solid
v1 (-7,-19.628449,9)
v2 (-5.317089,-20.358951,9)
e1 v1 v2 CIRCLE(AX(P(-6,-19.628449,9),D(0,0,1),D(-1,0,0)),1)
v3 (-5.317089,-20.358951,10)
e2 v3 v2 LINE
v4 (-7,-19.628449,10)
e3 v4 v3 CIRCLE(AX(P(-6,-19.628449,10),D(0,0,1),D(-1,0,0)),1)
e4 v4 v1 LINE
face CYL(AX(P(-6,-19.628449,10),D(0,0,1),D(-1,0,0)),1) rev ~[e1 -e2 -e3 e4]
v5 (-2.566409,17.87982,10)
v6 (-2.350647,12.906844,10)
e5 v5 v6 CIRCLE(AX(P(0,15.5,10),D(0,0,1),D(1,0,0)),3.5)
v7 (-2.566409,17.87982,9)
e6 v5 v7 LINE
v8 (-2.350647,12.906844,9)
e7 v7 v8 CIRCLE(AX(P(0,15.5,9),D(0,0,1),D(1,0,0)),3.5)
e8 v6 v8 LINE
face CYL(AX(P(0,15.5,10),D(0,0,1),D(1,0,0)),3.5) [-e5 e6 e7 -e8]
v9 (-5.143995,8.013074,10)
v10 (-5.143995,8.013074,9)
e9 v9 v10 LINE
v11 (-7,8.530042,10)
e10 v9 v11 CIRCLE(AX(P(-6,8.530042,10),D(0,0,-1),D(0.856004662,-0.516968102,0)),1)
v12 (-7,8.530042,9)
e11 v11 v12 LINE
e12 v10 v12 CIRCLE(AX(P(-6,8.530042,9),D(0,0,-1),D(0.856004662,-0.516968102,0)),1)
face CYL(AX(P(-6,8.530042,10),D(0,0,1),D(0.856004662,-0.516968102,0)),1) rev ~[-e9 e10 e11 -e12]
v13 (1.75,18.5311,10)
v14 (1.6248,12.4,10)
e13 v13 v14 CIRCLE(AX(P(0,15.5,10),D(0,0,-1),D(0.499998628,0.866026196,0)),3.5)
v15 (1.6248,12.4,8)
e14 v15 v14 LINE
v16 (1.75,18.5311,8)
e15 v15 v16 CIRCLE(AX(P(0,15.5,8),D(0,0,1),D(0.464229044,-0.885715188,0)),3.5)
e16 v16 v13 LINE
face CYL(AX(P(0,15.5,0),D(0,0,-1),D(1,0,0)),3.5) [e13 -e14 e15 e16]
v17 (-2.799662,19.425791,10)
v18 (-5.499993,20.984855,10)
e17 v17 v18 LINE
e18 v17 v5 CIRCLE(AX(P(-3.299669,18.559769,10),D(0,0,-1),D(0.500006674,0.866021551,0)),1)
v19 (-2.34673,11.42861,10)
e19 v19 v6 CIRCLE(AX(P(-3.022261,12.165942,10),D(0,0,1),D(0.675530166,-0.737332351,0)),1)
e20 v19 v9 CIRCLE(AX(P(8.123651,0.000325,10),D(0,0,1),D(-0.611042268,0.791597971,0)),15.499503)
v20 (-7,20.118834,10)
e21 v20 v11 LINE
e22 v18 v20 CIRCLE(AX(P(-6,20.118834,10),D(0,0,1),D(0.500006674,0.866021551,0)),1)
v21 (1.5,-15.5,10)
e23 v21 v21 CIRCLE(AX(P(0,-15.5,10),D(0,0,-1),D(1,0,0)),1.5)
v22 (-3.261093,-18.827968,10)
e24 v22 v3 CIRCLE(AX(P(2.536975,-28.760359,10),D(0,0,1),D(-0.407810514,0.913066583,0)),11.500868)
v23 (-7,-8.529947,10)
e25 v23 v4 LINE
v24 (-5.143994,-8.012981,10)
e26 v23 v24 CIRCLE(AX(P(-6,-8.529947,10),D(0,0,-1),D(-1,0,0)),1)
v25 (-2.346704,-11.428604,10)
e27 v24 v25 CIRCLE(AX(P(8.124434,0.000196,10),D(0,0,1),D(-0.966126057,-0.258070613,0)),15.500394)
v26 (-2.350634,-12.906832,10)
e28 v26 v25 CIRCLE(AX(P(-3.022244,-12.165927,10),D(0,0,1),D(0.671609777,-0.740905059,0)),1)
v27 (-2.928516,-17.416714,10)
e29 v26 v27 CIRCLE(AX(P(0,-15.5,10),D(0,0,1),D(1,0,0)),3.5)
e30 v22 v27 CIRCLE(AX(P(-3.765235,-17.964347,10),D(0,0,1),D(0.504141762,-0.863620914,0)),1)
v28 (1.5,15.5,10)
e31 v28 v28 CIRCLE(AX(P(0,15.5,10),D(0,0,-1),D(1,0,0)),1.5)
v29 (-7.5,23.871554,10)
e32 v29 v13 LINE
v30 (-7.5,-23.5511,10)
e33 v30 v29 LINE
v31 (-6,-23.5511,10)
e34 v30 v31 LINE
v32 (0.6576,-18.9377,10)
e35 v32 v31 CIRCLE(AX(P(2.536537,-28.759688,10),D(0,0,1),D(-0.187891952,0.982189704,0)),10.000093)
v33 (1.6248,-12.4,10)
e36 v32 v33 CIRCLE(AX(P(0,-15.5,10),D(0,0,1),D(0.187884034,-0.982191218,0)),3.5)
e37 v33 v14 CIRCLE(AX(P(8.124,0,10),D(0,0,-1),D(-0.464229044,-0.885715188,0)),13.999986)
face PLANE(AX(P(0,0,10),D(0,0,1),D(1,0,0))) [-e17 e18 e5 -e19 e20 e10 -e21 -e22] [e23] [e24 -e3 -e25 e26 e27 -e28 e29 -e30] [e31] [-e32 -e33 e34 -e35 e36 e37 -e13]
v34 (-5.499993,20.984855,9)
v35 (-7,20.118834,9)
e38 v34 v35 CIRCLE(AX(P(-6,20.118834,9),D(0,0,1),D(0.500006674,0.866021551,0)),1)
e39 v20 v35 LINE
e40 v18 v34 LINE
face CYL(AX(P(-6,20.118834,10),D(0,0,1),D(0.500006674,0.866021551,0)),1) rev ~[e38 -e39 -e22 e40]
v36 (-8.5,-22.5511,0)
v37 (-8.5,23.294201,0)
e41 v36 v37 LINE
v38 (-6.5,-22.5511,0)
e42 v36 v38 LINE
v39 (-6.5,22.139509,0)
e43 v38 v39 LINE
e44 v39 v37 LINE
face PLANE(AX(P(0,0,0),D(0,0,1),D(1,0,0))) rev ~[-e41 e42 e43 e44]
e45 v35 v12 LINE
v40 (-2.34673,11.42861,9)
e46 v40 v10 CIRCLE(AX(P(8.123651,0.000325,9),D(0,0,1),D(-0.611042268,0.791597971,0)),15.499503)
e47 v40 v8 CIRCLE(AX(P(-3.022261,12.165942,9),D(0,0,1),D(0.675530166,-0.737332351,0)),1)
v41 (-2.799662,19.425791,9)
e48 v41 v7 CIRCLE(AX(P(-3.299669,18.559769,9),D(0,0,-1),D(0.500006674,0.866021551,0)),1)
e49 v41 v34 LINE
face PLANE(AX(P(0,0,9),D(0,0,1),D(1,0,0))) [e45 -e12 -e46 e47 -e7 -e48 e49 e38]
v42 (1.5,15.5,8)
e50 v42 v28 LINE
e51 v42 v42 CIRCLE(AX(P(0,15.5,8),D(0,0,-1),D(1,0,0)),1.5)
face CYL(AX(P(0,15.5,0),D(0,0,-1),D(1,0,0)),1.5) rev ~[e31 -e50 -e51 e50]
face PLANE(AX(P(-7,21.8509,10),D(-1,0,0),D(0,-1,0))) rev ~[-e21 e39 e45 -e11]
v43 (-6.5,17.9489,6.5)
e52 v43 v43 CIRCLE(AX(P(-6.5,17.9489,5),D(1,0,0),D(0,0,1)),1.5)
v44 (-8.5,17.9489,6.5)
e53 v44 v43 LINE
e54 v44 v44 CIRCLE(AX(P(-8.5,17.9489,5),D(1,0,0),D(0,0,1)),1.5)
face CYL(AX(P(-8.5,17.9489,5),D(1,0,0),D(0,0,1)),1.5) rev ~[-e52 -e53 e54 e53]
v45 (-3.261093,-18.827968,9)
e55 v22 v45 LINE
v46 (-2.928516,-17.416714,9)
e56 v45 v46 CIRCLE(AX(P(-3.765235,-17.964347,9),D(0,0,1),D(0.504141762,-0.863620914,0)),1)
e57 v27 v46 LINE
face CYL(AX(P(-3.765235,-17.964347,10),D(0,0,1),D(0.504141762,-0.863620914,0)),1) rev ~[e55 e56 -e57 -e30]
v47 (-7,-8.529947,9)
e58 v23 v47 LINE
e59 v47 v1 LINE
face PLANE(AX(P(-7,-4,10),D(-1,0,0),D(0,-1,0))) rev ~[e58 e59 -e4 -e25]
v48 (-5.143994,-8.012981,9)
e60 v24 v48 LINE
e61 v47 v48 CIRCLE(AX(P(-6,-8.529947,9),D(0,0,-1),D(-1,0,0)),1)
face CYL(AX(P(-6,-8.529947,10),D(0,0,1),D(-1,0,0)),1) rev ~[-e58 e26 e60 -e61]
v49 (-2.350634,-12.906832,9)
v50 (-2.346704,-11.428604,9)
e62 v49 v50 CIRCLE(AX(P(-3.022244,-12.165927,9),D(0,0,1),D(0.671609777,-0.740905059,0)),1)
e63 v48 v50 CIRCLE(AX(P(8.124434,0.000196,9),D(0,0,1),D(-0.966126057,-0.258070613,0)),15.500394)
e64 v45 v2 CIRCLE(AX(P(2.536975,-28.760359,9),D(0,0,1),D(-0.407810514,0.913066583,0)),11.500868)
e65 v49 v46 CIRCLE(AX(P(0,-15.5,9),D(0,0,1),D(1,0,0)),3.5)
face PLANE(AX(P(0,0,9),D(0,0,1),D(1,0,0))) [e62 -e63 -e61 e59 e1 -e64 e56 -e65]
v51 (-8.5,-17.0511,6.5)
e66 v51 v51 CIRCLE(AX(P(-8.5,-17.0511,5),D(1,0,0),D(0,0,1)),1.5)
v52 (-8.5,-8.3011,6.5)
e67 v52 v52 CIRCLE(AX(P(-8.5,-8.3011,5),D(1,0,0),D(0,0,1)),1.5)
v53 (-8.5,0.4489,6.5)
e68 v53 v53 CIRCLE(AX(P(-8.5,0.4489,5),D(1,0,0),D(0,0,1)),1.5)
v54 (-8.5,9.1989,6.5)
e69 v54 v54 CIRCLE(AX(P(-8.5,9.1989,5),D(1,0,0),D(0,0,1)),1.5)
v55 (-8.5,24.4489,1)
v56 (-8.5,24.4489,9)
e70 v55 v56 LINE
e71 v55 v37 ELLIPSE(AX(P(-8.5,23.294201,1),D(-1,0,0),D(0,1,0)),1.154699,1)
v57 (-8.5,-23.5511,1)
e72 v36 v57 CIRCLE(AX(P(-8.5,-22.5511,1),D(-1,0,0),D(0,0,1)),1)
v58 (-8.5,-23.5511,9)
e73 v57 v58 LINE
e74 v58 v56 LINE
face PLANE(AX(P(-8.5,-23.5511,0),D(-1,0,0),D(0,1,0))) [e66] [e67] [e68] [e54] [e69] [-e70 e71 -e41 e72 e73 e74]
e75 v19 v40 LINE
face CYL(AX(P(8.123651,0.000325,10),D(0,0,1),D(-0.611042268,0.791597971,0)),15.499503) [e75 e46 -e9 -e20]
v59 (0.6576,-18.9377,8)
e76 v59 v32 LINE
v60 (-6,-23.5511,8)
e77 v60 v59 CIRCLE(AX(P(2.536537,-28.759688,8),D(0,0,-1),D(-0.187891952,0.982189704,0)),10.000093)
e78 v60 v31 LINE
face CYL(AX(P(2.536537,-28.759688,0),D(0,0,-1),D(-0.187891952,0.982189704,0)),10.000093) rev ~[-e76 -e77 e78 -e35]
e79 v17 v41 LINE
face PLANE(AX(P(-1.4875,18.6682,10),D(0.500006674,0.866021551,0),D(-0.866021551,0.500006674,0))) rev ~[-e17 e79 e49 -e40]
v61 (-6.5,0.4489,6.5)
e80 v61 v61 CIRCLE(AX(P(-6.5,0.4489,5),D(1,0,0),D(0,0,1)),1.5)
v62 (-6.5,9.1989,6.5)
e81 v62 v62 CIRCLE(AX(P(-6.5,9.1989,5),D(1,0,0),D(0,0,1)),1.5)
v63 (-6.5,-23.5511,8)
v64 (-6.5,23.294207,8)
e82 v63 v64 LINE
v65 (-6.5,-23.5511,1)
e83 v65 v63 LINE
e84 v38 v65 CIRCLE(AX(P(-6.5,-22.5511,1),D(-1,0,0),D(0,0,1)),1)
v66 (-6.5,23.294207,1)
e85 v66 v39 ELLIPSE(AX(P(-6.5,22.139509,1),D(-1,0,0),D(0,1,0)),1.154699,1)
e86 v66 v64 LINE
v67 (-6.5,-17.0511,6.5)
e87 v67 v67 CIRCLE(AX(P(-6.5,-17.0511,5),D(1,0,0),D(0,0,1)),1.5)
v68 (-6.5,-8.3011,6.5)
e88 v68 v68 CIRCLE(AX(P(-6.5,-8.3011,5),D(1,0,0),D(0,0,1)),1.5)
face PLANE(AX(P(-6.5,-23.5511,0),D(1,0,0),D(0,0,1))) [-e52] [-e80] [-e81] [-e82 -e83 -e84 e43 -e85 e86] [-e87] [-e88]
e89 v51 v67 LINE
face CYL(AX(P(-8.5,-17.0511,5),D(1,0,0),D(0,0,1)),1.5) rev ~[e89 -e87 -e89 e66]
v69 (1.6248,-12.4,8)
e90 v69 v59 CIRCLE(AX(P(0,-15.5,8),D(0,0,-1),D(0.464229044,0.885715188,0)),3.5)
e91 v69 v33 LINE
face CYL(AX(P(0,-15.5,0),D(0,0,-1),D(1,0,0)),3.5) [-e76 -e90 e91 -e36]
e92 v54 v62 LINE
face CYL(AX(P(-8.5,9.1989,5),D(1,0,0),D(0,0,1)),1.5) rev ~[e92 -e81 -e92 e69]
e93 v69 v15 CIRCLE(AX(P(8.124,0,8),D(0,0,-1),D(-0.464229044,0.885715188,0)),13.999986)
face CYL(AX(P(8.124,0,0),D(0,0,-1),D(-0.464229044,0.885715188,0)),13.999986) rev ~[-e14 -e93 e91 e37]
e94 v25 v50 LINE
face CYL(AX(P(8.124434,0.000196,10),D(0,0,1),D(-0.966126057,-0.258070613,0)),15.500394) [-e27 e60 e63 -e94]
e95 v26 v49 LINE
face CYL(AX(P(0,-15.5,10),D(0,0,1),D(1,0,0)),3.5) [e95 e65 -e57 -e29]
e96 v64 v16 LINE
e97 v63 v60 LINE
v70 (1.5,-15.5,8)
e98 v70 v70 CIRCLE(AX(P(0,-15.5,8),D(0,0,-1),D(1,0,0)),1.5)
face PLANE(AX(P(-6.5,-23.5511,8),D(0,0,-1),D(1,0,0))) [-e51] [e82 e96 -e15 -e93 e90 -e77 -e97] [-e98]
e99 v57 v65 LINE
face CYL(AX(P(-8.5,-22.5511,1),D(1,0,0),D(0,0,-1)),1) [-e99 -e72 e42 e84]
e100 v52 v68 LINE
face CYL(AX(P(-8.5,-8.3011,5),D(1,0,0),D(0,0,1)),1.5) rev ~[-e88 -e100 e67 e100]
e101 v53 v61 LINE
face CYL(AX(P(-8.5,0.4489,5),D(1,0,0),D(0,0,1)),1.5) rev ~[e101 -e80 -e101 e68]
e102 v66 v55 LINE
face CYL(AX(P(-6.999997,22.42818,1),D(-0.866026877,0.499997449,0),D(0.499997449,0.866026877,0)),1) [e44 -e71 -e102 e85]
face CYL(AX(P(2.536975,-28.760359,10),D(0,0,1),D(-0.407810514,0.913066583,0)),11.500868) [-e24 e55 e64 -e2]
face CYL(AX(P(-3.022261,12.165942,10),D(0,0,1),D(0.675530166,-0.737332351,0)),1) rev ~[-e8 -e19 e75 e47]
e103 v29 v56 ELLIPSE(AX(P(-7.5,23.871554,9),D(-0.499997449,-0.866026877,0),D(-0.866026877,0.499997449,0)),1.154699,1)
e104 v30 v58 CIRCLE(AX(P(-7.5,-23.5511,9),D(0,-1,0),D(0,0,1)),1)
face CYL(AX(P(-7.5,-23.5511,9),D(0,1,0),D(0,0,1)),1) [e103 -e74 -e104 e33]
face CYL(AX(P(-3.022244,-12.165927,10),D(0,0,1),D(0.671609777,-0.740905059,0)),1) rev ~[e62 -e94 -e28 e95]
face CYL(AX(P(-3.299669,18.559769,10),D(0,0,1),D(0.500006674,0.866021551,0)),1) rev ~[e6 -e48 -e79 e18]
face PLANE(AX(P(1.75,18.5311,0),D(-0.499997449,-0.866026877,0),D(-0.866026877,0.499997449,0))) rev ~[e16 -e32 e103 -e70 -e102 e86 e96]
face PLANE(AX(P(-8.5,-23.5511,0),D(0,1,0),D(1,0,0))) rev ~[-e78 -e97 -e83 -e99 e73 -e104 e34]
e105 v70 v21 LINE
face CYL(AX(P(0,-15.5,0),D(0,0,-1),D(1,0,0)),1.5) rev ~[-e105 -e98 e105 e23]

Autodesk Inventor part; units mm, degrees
ref_plane "YZ Plane" through (0, 0, 0) normal (1, 0, 0) x (0, 1, 0)
ref_plane "XZ Plane" through (0, 0, 0) normal (0, 1, 0) x (-1, 0, 0)
ref_plane "XY Plane" through (0, 0, 0) normal (0, 0, 1) x (1, 0, 0)
sketch "TopProfile" plane through (0, 0, 0) normal (0, 0, 1) x (1, 0, 0)
  circle A0 centre (0, 15.5) radius 3.5
  circle A1 centre (0, -15.5) radius 3.5
  line L0 (1.75, 18.5311) -> (-8.5, 24.4489)
  line L1 (-8.5, -23.5511) -> (-8.5, 24.4489)
  arc A2 (1.6248, 12.4) -> (1.6248, -12.4) centre (8.124, 0) ccw
  line L2 (-8.5, -23.5511) -> (-6, -23.5511)
  arc A3 (0.6576, -18.9377) -> (-6, -23.5511) centre (2.5365, -28.7596) ccw
  line L3 (0, -15.5) -> (0, 15.5) construction
  circle A4 centre (0, 15.5) radius 1.5
  circle A5 centre (0, -15.5) radius 1.5
  point P0 (0, 0)
  point P1 (0, 0)
  dimension "d1" = 7
  dimension "d3" = 2.5
  dimension "d4" = 60
  dimension "d5" = 48
  dimension "d6" = 14
  dimension "d7" = 31
  dimension "d9" = 8.5
  dimension "d10" = 3
  dimension "d12" = 10
extrude "TopProfileFeature" add sketch "TopProfile" along normal blind 10
sketch "FrontProfile" plane through (-8.5, -23.5511, 0) normal (0, -1, 0) x (1, 0, 0)
  line L0 (0, 0) -> (0, 10) construction
  line L1 (0, 10) -> (2.5, 10) projected
  line L2 (12, 0) -> (12, 10) construction
  line L3 (0, 10) -> (12, 10)
  line L4 (12, 10) -> (9.1576, 10) projected
  line L5 (0, 10) -> (0, 0)
  line L6 (0, 0) -> (2, 0)
  line L7 (2, 0) -> (2, 8)
  line L8 (2, 8) -> (12, 8)
  line L9 (12, 10) -> (12, 8)
  line L10 (0, 0) -> (2.5, 0) projected
  point P0 (10.1248, 10)
  dimension "d16" = 2
  dimension "d45" = 2
extrude "FrontProfileFeature" cut sketch "FrontProfile" against normal through all keep common part
fillet "SideFilletFeature" radius 1 1 edges at (-8.5, 0.4489, 10)
sketch "Sinks" plane through (0, 0, 10) normal (0, 0, 1) x (1, 0, 0)
  circle A0 centre (0, 15.5) radius 1.5 construction
  circle A1 centre (0, -15.5) radius 1.5 construction
  circle A2 centre (0, 15.5) radius 3.5
  circle A3 centre (0, -15.5) radius 3.5
  line L0 (-1.4875, 18.6682) -> (-7, 21.8509)
  line L1 (-7, 21.8509) -> (-7, 4)
  arc A4 (-1.3472, 12.2697) -> (-6.8509, 4) centre (8.124, 0) ccw
  line L2 (1.75, 18.5311) -> (-7.5, 23.8716) construction
  line L3 (-8.5, 24.4489) -> (-8.5, -23.5511) construction
  arc A5 (1.6248, 12.4) -> (1.6248, -12.4) centre (8.124, 0) ccw construction
  line L4 (-7, -4) -> (-7, -22.3326)
  arc A6 (-6.8509, -4) -> (-1.3472, -12.2697) centre (8.124, 0) ccw
  arc A7 (-2.1532, -18.2593) -> (-7, -22.3326) centre (2.5365, -28.7596) ccw
  arc A8 (0.6576, -18.9377) -> (-6, -23.5511) centre (2.5365, -28.7596) ccw construction
  line L5 (-7, 4) -> (-6.8509, 4)
  line L6 (-6.8509, -4) -> (-7, -4)
  arc A9 (1.6248, 12.4) -> (1.6248, -12.4) centre (8.124, 0) ccw construction
  line L7 (-5.876, 0) -> (-8.5, 0) construction
  line L8 (-8.5, 24.4489) -> (-8.5, -23.5511) construction
  point P0 (0, 0)
  dimension "d20" = 1.5
  dimension "d21" = 1.5
  dimension "d22" = 1.5
  dimension "d23" = 1.5
  dimension "d24" = 1.5
  dimension "d50" = 4
  dimension "d51" = 4
extrude "SinksFeature" cut sketch "Sinks" against normal blind 1 contours A2 A4 L5 L1 L0 | A3 A7 L4 L6 A6
fillet "SinkFilletsFeature" radius 1 10 edges at (-7, 21.8509, 9.5) (-7, 4, 9.5) (-1.3472, 12.2697, 9.5) (-1.4875, 18.6682, 9.5) (-7, -22.3326, 9.5) (-7, -4, 9.5) (-1.3472, -12.2697, 9.5) (-2.1532, -18.2593, 9.5) (-6.8509, 4, 9.5) (-6.8509, -4, 9.5)
sketch "SideHoles" plane through (-8.5, -23.5511, 0) normal (-1, 0, 0) x (0, 0, 1)
  line L0 (10, 0) -> (10, 47.4226) construction
  line L1 (0, 48) -> (9, 48) construction
  circle A0 centre (5, 41.5) radius 1.75
  line L2 (5, 41.5) -> (5, 6.5) construction
  circle A1 centre (5, 24) radius 1.75
  circle A2 centre (5, 6.5) radius 1.75
  line L3 (5, 24) -> (0, 24) construction
  circle A3 centre (5, 15.25) radius 1.75
  circle A4 centre (5, 32.75) radius 1.75
  line L4 (0, 48) -> (0, 0) construction
  line L5 (8, 0) -> (0, 0) projected
  dimension "d28" = 3.5
  dimension "d30" = 5
  dimension "d33" = 35
  dimension "d43" = 8.75
  dimension "d44" = 8.75
  dimension "d46" = 5
  dimension "d47" = 6.5
  dimension "d48" = 6.5
hole "SideHolesFeature" at (-8.5, 17.9489, 5) at (-8.5, 0.4489, 5) at (-8.5, -17.0511, 5) at (-8.5, 9.1989, 5) at (-8.5, -8.3011, 5) direction (1, 0, 0) diameter 3 end through all
fillet "BottomCornerFilletsFeature" radius 1 2 edges at (-7.5, -23.5511, 0) (-7.5, 23.8716, 0)
equation "\"d21\" = d20"
equation "\"d22\" = d20"
equation "\"d23\" = d20"
equation "\"d24\" = d20"
equation "\"d51\" = d50"
equation "\"d30\" = 0.5 * d29"
equation "\"d43\" = 0.25 * d33"
equation "\"d44\" = d43"
equation "\"d47\" = d48"
equation "\"d29\" = 10"
properties part number "SpineMiddleCover"
